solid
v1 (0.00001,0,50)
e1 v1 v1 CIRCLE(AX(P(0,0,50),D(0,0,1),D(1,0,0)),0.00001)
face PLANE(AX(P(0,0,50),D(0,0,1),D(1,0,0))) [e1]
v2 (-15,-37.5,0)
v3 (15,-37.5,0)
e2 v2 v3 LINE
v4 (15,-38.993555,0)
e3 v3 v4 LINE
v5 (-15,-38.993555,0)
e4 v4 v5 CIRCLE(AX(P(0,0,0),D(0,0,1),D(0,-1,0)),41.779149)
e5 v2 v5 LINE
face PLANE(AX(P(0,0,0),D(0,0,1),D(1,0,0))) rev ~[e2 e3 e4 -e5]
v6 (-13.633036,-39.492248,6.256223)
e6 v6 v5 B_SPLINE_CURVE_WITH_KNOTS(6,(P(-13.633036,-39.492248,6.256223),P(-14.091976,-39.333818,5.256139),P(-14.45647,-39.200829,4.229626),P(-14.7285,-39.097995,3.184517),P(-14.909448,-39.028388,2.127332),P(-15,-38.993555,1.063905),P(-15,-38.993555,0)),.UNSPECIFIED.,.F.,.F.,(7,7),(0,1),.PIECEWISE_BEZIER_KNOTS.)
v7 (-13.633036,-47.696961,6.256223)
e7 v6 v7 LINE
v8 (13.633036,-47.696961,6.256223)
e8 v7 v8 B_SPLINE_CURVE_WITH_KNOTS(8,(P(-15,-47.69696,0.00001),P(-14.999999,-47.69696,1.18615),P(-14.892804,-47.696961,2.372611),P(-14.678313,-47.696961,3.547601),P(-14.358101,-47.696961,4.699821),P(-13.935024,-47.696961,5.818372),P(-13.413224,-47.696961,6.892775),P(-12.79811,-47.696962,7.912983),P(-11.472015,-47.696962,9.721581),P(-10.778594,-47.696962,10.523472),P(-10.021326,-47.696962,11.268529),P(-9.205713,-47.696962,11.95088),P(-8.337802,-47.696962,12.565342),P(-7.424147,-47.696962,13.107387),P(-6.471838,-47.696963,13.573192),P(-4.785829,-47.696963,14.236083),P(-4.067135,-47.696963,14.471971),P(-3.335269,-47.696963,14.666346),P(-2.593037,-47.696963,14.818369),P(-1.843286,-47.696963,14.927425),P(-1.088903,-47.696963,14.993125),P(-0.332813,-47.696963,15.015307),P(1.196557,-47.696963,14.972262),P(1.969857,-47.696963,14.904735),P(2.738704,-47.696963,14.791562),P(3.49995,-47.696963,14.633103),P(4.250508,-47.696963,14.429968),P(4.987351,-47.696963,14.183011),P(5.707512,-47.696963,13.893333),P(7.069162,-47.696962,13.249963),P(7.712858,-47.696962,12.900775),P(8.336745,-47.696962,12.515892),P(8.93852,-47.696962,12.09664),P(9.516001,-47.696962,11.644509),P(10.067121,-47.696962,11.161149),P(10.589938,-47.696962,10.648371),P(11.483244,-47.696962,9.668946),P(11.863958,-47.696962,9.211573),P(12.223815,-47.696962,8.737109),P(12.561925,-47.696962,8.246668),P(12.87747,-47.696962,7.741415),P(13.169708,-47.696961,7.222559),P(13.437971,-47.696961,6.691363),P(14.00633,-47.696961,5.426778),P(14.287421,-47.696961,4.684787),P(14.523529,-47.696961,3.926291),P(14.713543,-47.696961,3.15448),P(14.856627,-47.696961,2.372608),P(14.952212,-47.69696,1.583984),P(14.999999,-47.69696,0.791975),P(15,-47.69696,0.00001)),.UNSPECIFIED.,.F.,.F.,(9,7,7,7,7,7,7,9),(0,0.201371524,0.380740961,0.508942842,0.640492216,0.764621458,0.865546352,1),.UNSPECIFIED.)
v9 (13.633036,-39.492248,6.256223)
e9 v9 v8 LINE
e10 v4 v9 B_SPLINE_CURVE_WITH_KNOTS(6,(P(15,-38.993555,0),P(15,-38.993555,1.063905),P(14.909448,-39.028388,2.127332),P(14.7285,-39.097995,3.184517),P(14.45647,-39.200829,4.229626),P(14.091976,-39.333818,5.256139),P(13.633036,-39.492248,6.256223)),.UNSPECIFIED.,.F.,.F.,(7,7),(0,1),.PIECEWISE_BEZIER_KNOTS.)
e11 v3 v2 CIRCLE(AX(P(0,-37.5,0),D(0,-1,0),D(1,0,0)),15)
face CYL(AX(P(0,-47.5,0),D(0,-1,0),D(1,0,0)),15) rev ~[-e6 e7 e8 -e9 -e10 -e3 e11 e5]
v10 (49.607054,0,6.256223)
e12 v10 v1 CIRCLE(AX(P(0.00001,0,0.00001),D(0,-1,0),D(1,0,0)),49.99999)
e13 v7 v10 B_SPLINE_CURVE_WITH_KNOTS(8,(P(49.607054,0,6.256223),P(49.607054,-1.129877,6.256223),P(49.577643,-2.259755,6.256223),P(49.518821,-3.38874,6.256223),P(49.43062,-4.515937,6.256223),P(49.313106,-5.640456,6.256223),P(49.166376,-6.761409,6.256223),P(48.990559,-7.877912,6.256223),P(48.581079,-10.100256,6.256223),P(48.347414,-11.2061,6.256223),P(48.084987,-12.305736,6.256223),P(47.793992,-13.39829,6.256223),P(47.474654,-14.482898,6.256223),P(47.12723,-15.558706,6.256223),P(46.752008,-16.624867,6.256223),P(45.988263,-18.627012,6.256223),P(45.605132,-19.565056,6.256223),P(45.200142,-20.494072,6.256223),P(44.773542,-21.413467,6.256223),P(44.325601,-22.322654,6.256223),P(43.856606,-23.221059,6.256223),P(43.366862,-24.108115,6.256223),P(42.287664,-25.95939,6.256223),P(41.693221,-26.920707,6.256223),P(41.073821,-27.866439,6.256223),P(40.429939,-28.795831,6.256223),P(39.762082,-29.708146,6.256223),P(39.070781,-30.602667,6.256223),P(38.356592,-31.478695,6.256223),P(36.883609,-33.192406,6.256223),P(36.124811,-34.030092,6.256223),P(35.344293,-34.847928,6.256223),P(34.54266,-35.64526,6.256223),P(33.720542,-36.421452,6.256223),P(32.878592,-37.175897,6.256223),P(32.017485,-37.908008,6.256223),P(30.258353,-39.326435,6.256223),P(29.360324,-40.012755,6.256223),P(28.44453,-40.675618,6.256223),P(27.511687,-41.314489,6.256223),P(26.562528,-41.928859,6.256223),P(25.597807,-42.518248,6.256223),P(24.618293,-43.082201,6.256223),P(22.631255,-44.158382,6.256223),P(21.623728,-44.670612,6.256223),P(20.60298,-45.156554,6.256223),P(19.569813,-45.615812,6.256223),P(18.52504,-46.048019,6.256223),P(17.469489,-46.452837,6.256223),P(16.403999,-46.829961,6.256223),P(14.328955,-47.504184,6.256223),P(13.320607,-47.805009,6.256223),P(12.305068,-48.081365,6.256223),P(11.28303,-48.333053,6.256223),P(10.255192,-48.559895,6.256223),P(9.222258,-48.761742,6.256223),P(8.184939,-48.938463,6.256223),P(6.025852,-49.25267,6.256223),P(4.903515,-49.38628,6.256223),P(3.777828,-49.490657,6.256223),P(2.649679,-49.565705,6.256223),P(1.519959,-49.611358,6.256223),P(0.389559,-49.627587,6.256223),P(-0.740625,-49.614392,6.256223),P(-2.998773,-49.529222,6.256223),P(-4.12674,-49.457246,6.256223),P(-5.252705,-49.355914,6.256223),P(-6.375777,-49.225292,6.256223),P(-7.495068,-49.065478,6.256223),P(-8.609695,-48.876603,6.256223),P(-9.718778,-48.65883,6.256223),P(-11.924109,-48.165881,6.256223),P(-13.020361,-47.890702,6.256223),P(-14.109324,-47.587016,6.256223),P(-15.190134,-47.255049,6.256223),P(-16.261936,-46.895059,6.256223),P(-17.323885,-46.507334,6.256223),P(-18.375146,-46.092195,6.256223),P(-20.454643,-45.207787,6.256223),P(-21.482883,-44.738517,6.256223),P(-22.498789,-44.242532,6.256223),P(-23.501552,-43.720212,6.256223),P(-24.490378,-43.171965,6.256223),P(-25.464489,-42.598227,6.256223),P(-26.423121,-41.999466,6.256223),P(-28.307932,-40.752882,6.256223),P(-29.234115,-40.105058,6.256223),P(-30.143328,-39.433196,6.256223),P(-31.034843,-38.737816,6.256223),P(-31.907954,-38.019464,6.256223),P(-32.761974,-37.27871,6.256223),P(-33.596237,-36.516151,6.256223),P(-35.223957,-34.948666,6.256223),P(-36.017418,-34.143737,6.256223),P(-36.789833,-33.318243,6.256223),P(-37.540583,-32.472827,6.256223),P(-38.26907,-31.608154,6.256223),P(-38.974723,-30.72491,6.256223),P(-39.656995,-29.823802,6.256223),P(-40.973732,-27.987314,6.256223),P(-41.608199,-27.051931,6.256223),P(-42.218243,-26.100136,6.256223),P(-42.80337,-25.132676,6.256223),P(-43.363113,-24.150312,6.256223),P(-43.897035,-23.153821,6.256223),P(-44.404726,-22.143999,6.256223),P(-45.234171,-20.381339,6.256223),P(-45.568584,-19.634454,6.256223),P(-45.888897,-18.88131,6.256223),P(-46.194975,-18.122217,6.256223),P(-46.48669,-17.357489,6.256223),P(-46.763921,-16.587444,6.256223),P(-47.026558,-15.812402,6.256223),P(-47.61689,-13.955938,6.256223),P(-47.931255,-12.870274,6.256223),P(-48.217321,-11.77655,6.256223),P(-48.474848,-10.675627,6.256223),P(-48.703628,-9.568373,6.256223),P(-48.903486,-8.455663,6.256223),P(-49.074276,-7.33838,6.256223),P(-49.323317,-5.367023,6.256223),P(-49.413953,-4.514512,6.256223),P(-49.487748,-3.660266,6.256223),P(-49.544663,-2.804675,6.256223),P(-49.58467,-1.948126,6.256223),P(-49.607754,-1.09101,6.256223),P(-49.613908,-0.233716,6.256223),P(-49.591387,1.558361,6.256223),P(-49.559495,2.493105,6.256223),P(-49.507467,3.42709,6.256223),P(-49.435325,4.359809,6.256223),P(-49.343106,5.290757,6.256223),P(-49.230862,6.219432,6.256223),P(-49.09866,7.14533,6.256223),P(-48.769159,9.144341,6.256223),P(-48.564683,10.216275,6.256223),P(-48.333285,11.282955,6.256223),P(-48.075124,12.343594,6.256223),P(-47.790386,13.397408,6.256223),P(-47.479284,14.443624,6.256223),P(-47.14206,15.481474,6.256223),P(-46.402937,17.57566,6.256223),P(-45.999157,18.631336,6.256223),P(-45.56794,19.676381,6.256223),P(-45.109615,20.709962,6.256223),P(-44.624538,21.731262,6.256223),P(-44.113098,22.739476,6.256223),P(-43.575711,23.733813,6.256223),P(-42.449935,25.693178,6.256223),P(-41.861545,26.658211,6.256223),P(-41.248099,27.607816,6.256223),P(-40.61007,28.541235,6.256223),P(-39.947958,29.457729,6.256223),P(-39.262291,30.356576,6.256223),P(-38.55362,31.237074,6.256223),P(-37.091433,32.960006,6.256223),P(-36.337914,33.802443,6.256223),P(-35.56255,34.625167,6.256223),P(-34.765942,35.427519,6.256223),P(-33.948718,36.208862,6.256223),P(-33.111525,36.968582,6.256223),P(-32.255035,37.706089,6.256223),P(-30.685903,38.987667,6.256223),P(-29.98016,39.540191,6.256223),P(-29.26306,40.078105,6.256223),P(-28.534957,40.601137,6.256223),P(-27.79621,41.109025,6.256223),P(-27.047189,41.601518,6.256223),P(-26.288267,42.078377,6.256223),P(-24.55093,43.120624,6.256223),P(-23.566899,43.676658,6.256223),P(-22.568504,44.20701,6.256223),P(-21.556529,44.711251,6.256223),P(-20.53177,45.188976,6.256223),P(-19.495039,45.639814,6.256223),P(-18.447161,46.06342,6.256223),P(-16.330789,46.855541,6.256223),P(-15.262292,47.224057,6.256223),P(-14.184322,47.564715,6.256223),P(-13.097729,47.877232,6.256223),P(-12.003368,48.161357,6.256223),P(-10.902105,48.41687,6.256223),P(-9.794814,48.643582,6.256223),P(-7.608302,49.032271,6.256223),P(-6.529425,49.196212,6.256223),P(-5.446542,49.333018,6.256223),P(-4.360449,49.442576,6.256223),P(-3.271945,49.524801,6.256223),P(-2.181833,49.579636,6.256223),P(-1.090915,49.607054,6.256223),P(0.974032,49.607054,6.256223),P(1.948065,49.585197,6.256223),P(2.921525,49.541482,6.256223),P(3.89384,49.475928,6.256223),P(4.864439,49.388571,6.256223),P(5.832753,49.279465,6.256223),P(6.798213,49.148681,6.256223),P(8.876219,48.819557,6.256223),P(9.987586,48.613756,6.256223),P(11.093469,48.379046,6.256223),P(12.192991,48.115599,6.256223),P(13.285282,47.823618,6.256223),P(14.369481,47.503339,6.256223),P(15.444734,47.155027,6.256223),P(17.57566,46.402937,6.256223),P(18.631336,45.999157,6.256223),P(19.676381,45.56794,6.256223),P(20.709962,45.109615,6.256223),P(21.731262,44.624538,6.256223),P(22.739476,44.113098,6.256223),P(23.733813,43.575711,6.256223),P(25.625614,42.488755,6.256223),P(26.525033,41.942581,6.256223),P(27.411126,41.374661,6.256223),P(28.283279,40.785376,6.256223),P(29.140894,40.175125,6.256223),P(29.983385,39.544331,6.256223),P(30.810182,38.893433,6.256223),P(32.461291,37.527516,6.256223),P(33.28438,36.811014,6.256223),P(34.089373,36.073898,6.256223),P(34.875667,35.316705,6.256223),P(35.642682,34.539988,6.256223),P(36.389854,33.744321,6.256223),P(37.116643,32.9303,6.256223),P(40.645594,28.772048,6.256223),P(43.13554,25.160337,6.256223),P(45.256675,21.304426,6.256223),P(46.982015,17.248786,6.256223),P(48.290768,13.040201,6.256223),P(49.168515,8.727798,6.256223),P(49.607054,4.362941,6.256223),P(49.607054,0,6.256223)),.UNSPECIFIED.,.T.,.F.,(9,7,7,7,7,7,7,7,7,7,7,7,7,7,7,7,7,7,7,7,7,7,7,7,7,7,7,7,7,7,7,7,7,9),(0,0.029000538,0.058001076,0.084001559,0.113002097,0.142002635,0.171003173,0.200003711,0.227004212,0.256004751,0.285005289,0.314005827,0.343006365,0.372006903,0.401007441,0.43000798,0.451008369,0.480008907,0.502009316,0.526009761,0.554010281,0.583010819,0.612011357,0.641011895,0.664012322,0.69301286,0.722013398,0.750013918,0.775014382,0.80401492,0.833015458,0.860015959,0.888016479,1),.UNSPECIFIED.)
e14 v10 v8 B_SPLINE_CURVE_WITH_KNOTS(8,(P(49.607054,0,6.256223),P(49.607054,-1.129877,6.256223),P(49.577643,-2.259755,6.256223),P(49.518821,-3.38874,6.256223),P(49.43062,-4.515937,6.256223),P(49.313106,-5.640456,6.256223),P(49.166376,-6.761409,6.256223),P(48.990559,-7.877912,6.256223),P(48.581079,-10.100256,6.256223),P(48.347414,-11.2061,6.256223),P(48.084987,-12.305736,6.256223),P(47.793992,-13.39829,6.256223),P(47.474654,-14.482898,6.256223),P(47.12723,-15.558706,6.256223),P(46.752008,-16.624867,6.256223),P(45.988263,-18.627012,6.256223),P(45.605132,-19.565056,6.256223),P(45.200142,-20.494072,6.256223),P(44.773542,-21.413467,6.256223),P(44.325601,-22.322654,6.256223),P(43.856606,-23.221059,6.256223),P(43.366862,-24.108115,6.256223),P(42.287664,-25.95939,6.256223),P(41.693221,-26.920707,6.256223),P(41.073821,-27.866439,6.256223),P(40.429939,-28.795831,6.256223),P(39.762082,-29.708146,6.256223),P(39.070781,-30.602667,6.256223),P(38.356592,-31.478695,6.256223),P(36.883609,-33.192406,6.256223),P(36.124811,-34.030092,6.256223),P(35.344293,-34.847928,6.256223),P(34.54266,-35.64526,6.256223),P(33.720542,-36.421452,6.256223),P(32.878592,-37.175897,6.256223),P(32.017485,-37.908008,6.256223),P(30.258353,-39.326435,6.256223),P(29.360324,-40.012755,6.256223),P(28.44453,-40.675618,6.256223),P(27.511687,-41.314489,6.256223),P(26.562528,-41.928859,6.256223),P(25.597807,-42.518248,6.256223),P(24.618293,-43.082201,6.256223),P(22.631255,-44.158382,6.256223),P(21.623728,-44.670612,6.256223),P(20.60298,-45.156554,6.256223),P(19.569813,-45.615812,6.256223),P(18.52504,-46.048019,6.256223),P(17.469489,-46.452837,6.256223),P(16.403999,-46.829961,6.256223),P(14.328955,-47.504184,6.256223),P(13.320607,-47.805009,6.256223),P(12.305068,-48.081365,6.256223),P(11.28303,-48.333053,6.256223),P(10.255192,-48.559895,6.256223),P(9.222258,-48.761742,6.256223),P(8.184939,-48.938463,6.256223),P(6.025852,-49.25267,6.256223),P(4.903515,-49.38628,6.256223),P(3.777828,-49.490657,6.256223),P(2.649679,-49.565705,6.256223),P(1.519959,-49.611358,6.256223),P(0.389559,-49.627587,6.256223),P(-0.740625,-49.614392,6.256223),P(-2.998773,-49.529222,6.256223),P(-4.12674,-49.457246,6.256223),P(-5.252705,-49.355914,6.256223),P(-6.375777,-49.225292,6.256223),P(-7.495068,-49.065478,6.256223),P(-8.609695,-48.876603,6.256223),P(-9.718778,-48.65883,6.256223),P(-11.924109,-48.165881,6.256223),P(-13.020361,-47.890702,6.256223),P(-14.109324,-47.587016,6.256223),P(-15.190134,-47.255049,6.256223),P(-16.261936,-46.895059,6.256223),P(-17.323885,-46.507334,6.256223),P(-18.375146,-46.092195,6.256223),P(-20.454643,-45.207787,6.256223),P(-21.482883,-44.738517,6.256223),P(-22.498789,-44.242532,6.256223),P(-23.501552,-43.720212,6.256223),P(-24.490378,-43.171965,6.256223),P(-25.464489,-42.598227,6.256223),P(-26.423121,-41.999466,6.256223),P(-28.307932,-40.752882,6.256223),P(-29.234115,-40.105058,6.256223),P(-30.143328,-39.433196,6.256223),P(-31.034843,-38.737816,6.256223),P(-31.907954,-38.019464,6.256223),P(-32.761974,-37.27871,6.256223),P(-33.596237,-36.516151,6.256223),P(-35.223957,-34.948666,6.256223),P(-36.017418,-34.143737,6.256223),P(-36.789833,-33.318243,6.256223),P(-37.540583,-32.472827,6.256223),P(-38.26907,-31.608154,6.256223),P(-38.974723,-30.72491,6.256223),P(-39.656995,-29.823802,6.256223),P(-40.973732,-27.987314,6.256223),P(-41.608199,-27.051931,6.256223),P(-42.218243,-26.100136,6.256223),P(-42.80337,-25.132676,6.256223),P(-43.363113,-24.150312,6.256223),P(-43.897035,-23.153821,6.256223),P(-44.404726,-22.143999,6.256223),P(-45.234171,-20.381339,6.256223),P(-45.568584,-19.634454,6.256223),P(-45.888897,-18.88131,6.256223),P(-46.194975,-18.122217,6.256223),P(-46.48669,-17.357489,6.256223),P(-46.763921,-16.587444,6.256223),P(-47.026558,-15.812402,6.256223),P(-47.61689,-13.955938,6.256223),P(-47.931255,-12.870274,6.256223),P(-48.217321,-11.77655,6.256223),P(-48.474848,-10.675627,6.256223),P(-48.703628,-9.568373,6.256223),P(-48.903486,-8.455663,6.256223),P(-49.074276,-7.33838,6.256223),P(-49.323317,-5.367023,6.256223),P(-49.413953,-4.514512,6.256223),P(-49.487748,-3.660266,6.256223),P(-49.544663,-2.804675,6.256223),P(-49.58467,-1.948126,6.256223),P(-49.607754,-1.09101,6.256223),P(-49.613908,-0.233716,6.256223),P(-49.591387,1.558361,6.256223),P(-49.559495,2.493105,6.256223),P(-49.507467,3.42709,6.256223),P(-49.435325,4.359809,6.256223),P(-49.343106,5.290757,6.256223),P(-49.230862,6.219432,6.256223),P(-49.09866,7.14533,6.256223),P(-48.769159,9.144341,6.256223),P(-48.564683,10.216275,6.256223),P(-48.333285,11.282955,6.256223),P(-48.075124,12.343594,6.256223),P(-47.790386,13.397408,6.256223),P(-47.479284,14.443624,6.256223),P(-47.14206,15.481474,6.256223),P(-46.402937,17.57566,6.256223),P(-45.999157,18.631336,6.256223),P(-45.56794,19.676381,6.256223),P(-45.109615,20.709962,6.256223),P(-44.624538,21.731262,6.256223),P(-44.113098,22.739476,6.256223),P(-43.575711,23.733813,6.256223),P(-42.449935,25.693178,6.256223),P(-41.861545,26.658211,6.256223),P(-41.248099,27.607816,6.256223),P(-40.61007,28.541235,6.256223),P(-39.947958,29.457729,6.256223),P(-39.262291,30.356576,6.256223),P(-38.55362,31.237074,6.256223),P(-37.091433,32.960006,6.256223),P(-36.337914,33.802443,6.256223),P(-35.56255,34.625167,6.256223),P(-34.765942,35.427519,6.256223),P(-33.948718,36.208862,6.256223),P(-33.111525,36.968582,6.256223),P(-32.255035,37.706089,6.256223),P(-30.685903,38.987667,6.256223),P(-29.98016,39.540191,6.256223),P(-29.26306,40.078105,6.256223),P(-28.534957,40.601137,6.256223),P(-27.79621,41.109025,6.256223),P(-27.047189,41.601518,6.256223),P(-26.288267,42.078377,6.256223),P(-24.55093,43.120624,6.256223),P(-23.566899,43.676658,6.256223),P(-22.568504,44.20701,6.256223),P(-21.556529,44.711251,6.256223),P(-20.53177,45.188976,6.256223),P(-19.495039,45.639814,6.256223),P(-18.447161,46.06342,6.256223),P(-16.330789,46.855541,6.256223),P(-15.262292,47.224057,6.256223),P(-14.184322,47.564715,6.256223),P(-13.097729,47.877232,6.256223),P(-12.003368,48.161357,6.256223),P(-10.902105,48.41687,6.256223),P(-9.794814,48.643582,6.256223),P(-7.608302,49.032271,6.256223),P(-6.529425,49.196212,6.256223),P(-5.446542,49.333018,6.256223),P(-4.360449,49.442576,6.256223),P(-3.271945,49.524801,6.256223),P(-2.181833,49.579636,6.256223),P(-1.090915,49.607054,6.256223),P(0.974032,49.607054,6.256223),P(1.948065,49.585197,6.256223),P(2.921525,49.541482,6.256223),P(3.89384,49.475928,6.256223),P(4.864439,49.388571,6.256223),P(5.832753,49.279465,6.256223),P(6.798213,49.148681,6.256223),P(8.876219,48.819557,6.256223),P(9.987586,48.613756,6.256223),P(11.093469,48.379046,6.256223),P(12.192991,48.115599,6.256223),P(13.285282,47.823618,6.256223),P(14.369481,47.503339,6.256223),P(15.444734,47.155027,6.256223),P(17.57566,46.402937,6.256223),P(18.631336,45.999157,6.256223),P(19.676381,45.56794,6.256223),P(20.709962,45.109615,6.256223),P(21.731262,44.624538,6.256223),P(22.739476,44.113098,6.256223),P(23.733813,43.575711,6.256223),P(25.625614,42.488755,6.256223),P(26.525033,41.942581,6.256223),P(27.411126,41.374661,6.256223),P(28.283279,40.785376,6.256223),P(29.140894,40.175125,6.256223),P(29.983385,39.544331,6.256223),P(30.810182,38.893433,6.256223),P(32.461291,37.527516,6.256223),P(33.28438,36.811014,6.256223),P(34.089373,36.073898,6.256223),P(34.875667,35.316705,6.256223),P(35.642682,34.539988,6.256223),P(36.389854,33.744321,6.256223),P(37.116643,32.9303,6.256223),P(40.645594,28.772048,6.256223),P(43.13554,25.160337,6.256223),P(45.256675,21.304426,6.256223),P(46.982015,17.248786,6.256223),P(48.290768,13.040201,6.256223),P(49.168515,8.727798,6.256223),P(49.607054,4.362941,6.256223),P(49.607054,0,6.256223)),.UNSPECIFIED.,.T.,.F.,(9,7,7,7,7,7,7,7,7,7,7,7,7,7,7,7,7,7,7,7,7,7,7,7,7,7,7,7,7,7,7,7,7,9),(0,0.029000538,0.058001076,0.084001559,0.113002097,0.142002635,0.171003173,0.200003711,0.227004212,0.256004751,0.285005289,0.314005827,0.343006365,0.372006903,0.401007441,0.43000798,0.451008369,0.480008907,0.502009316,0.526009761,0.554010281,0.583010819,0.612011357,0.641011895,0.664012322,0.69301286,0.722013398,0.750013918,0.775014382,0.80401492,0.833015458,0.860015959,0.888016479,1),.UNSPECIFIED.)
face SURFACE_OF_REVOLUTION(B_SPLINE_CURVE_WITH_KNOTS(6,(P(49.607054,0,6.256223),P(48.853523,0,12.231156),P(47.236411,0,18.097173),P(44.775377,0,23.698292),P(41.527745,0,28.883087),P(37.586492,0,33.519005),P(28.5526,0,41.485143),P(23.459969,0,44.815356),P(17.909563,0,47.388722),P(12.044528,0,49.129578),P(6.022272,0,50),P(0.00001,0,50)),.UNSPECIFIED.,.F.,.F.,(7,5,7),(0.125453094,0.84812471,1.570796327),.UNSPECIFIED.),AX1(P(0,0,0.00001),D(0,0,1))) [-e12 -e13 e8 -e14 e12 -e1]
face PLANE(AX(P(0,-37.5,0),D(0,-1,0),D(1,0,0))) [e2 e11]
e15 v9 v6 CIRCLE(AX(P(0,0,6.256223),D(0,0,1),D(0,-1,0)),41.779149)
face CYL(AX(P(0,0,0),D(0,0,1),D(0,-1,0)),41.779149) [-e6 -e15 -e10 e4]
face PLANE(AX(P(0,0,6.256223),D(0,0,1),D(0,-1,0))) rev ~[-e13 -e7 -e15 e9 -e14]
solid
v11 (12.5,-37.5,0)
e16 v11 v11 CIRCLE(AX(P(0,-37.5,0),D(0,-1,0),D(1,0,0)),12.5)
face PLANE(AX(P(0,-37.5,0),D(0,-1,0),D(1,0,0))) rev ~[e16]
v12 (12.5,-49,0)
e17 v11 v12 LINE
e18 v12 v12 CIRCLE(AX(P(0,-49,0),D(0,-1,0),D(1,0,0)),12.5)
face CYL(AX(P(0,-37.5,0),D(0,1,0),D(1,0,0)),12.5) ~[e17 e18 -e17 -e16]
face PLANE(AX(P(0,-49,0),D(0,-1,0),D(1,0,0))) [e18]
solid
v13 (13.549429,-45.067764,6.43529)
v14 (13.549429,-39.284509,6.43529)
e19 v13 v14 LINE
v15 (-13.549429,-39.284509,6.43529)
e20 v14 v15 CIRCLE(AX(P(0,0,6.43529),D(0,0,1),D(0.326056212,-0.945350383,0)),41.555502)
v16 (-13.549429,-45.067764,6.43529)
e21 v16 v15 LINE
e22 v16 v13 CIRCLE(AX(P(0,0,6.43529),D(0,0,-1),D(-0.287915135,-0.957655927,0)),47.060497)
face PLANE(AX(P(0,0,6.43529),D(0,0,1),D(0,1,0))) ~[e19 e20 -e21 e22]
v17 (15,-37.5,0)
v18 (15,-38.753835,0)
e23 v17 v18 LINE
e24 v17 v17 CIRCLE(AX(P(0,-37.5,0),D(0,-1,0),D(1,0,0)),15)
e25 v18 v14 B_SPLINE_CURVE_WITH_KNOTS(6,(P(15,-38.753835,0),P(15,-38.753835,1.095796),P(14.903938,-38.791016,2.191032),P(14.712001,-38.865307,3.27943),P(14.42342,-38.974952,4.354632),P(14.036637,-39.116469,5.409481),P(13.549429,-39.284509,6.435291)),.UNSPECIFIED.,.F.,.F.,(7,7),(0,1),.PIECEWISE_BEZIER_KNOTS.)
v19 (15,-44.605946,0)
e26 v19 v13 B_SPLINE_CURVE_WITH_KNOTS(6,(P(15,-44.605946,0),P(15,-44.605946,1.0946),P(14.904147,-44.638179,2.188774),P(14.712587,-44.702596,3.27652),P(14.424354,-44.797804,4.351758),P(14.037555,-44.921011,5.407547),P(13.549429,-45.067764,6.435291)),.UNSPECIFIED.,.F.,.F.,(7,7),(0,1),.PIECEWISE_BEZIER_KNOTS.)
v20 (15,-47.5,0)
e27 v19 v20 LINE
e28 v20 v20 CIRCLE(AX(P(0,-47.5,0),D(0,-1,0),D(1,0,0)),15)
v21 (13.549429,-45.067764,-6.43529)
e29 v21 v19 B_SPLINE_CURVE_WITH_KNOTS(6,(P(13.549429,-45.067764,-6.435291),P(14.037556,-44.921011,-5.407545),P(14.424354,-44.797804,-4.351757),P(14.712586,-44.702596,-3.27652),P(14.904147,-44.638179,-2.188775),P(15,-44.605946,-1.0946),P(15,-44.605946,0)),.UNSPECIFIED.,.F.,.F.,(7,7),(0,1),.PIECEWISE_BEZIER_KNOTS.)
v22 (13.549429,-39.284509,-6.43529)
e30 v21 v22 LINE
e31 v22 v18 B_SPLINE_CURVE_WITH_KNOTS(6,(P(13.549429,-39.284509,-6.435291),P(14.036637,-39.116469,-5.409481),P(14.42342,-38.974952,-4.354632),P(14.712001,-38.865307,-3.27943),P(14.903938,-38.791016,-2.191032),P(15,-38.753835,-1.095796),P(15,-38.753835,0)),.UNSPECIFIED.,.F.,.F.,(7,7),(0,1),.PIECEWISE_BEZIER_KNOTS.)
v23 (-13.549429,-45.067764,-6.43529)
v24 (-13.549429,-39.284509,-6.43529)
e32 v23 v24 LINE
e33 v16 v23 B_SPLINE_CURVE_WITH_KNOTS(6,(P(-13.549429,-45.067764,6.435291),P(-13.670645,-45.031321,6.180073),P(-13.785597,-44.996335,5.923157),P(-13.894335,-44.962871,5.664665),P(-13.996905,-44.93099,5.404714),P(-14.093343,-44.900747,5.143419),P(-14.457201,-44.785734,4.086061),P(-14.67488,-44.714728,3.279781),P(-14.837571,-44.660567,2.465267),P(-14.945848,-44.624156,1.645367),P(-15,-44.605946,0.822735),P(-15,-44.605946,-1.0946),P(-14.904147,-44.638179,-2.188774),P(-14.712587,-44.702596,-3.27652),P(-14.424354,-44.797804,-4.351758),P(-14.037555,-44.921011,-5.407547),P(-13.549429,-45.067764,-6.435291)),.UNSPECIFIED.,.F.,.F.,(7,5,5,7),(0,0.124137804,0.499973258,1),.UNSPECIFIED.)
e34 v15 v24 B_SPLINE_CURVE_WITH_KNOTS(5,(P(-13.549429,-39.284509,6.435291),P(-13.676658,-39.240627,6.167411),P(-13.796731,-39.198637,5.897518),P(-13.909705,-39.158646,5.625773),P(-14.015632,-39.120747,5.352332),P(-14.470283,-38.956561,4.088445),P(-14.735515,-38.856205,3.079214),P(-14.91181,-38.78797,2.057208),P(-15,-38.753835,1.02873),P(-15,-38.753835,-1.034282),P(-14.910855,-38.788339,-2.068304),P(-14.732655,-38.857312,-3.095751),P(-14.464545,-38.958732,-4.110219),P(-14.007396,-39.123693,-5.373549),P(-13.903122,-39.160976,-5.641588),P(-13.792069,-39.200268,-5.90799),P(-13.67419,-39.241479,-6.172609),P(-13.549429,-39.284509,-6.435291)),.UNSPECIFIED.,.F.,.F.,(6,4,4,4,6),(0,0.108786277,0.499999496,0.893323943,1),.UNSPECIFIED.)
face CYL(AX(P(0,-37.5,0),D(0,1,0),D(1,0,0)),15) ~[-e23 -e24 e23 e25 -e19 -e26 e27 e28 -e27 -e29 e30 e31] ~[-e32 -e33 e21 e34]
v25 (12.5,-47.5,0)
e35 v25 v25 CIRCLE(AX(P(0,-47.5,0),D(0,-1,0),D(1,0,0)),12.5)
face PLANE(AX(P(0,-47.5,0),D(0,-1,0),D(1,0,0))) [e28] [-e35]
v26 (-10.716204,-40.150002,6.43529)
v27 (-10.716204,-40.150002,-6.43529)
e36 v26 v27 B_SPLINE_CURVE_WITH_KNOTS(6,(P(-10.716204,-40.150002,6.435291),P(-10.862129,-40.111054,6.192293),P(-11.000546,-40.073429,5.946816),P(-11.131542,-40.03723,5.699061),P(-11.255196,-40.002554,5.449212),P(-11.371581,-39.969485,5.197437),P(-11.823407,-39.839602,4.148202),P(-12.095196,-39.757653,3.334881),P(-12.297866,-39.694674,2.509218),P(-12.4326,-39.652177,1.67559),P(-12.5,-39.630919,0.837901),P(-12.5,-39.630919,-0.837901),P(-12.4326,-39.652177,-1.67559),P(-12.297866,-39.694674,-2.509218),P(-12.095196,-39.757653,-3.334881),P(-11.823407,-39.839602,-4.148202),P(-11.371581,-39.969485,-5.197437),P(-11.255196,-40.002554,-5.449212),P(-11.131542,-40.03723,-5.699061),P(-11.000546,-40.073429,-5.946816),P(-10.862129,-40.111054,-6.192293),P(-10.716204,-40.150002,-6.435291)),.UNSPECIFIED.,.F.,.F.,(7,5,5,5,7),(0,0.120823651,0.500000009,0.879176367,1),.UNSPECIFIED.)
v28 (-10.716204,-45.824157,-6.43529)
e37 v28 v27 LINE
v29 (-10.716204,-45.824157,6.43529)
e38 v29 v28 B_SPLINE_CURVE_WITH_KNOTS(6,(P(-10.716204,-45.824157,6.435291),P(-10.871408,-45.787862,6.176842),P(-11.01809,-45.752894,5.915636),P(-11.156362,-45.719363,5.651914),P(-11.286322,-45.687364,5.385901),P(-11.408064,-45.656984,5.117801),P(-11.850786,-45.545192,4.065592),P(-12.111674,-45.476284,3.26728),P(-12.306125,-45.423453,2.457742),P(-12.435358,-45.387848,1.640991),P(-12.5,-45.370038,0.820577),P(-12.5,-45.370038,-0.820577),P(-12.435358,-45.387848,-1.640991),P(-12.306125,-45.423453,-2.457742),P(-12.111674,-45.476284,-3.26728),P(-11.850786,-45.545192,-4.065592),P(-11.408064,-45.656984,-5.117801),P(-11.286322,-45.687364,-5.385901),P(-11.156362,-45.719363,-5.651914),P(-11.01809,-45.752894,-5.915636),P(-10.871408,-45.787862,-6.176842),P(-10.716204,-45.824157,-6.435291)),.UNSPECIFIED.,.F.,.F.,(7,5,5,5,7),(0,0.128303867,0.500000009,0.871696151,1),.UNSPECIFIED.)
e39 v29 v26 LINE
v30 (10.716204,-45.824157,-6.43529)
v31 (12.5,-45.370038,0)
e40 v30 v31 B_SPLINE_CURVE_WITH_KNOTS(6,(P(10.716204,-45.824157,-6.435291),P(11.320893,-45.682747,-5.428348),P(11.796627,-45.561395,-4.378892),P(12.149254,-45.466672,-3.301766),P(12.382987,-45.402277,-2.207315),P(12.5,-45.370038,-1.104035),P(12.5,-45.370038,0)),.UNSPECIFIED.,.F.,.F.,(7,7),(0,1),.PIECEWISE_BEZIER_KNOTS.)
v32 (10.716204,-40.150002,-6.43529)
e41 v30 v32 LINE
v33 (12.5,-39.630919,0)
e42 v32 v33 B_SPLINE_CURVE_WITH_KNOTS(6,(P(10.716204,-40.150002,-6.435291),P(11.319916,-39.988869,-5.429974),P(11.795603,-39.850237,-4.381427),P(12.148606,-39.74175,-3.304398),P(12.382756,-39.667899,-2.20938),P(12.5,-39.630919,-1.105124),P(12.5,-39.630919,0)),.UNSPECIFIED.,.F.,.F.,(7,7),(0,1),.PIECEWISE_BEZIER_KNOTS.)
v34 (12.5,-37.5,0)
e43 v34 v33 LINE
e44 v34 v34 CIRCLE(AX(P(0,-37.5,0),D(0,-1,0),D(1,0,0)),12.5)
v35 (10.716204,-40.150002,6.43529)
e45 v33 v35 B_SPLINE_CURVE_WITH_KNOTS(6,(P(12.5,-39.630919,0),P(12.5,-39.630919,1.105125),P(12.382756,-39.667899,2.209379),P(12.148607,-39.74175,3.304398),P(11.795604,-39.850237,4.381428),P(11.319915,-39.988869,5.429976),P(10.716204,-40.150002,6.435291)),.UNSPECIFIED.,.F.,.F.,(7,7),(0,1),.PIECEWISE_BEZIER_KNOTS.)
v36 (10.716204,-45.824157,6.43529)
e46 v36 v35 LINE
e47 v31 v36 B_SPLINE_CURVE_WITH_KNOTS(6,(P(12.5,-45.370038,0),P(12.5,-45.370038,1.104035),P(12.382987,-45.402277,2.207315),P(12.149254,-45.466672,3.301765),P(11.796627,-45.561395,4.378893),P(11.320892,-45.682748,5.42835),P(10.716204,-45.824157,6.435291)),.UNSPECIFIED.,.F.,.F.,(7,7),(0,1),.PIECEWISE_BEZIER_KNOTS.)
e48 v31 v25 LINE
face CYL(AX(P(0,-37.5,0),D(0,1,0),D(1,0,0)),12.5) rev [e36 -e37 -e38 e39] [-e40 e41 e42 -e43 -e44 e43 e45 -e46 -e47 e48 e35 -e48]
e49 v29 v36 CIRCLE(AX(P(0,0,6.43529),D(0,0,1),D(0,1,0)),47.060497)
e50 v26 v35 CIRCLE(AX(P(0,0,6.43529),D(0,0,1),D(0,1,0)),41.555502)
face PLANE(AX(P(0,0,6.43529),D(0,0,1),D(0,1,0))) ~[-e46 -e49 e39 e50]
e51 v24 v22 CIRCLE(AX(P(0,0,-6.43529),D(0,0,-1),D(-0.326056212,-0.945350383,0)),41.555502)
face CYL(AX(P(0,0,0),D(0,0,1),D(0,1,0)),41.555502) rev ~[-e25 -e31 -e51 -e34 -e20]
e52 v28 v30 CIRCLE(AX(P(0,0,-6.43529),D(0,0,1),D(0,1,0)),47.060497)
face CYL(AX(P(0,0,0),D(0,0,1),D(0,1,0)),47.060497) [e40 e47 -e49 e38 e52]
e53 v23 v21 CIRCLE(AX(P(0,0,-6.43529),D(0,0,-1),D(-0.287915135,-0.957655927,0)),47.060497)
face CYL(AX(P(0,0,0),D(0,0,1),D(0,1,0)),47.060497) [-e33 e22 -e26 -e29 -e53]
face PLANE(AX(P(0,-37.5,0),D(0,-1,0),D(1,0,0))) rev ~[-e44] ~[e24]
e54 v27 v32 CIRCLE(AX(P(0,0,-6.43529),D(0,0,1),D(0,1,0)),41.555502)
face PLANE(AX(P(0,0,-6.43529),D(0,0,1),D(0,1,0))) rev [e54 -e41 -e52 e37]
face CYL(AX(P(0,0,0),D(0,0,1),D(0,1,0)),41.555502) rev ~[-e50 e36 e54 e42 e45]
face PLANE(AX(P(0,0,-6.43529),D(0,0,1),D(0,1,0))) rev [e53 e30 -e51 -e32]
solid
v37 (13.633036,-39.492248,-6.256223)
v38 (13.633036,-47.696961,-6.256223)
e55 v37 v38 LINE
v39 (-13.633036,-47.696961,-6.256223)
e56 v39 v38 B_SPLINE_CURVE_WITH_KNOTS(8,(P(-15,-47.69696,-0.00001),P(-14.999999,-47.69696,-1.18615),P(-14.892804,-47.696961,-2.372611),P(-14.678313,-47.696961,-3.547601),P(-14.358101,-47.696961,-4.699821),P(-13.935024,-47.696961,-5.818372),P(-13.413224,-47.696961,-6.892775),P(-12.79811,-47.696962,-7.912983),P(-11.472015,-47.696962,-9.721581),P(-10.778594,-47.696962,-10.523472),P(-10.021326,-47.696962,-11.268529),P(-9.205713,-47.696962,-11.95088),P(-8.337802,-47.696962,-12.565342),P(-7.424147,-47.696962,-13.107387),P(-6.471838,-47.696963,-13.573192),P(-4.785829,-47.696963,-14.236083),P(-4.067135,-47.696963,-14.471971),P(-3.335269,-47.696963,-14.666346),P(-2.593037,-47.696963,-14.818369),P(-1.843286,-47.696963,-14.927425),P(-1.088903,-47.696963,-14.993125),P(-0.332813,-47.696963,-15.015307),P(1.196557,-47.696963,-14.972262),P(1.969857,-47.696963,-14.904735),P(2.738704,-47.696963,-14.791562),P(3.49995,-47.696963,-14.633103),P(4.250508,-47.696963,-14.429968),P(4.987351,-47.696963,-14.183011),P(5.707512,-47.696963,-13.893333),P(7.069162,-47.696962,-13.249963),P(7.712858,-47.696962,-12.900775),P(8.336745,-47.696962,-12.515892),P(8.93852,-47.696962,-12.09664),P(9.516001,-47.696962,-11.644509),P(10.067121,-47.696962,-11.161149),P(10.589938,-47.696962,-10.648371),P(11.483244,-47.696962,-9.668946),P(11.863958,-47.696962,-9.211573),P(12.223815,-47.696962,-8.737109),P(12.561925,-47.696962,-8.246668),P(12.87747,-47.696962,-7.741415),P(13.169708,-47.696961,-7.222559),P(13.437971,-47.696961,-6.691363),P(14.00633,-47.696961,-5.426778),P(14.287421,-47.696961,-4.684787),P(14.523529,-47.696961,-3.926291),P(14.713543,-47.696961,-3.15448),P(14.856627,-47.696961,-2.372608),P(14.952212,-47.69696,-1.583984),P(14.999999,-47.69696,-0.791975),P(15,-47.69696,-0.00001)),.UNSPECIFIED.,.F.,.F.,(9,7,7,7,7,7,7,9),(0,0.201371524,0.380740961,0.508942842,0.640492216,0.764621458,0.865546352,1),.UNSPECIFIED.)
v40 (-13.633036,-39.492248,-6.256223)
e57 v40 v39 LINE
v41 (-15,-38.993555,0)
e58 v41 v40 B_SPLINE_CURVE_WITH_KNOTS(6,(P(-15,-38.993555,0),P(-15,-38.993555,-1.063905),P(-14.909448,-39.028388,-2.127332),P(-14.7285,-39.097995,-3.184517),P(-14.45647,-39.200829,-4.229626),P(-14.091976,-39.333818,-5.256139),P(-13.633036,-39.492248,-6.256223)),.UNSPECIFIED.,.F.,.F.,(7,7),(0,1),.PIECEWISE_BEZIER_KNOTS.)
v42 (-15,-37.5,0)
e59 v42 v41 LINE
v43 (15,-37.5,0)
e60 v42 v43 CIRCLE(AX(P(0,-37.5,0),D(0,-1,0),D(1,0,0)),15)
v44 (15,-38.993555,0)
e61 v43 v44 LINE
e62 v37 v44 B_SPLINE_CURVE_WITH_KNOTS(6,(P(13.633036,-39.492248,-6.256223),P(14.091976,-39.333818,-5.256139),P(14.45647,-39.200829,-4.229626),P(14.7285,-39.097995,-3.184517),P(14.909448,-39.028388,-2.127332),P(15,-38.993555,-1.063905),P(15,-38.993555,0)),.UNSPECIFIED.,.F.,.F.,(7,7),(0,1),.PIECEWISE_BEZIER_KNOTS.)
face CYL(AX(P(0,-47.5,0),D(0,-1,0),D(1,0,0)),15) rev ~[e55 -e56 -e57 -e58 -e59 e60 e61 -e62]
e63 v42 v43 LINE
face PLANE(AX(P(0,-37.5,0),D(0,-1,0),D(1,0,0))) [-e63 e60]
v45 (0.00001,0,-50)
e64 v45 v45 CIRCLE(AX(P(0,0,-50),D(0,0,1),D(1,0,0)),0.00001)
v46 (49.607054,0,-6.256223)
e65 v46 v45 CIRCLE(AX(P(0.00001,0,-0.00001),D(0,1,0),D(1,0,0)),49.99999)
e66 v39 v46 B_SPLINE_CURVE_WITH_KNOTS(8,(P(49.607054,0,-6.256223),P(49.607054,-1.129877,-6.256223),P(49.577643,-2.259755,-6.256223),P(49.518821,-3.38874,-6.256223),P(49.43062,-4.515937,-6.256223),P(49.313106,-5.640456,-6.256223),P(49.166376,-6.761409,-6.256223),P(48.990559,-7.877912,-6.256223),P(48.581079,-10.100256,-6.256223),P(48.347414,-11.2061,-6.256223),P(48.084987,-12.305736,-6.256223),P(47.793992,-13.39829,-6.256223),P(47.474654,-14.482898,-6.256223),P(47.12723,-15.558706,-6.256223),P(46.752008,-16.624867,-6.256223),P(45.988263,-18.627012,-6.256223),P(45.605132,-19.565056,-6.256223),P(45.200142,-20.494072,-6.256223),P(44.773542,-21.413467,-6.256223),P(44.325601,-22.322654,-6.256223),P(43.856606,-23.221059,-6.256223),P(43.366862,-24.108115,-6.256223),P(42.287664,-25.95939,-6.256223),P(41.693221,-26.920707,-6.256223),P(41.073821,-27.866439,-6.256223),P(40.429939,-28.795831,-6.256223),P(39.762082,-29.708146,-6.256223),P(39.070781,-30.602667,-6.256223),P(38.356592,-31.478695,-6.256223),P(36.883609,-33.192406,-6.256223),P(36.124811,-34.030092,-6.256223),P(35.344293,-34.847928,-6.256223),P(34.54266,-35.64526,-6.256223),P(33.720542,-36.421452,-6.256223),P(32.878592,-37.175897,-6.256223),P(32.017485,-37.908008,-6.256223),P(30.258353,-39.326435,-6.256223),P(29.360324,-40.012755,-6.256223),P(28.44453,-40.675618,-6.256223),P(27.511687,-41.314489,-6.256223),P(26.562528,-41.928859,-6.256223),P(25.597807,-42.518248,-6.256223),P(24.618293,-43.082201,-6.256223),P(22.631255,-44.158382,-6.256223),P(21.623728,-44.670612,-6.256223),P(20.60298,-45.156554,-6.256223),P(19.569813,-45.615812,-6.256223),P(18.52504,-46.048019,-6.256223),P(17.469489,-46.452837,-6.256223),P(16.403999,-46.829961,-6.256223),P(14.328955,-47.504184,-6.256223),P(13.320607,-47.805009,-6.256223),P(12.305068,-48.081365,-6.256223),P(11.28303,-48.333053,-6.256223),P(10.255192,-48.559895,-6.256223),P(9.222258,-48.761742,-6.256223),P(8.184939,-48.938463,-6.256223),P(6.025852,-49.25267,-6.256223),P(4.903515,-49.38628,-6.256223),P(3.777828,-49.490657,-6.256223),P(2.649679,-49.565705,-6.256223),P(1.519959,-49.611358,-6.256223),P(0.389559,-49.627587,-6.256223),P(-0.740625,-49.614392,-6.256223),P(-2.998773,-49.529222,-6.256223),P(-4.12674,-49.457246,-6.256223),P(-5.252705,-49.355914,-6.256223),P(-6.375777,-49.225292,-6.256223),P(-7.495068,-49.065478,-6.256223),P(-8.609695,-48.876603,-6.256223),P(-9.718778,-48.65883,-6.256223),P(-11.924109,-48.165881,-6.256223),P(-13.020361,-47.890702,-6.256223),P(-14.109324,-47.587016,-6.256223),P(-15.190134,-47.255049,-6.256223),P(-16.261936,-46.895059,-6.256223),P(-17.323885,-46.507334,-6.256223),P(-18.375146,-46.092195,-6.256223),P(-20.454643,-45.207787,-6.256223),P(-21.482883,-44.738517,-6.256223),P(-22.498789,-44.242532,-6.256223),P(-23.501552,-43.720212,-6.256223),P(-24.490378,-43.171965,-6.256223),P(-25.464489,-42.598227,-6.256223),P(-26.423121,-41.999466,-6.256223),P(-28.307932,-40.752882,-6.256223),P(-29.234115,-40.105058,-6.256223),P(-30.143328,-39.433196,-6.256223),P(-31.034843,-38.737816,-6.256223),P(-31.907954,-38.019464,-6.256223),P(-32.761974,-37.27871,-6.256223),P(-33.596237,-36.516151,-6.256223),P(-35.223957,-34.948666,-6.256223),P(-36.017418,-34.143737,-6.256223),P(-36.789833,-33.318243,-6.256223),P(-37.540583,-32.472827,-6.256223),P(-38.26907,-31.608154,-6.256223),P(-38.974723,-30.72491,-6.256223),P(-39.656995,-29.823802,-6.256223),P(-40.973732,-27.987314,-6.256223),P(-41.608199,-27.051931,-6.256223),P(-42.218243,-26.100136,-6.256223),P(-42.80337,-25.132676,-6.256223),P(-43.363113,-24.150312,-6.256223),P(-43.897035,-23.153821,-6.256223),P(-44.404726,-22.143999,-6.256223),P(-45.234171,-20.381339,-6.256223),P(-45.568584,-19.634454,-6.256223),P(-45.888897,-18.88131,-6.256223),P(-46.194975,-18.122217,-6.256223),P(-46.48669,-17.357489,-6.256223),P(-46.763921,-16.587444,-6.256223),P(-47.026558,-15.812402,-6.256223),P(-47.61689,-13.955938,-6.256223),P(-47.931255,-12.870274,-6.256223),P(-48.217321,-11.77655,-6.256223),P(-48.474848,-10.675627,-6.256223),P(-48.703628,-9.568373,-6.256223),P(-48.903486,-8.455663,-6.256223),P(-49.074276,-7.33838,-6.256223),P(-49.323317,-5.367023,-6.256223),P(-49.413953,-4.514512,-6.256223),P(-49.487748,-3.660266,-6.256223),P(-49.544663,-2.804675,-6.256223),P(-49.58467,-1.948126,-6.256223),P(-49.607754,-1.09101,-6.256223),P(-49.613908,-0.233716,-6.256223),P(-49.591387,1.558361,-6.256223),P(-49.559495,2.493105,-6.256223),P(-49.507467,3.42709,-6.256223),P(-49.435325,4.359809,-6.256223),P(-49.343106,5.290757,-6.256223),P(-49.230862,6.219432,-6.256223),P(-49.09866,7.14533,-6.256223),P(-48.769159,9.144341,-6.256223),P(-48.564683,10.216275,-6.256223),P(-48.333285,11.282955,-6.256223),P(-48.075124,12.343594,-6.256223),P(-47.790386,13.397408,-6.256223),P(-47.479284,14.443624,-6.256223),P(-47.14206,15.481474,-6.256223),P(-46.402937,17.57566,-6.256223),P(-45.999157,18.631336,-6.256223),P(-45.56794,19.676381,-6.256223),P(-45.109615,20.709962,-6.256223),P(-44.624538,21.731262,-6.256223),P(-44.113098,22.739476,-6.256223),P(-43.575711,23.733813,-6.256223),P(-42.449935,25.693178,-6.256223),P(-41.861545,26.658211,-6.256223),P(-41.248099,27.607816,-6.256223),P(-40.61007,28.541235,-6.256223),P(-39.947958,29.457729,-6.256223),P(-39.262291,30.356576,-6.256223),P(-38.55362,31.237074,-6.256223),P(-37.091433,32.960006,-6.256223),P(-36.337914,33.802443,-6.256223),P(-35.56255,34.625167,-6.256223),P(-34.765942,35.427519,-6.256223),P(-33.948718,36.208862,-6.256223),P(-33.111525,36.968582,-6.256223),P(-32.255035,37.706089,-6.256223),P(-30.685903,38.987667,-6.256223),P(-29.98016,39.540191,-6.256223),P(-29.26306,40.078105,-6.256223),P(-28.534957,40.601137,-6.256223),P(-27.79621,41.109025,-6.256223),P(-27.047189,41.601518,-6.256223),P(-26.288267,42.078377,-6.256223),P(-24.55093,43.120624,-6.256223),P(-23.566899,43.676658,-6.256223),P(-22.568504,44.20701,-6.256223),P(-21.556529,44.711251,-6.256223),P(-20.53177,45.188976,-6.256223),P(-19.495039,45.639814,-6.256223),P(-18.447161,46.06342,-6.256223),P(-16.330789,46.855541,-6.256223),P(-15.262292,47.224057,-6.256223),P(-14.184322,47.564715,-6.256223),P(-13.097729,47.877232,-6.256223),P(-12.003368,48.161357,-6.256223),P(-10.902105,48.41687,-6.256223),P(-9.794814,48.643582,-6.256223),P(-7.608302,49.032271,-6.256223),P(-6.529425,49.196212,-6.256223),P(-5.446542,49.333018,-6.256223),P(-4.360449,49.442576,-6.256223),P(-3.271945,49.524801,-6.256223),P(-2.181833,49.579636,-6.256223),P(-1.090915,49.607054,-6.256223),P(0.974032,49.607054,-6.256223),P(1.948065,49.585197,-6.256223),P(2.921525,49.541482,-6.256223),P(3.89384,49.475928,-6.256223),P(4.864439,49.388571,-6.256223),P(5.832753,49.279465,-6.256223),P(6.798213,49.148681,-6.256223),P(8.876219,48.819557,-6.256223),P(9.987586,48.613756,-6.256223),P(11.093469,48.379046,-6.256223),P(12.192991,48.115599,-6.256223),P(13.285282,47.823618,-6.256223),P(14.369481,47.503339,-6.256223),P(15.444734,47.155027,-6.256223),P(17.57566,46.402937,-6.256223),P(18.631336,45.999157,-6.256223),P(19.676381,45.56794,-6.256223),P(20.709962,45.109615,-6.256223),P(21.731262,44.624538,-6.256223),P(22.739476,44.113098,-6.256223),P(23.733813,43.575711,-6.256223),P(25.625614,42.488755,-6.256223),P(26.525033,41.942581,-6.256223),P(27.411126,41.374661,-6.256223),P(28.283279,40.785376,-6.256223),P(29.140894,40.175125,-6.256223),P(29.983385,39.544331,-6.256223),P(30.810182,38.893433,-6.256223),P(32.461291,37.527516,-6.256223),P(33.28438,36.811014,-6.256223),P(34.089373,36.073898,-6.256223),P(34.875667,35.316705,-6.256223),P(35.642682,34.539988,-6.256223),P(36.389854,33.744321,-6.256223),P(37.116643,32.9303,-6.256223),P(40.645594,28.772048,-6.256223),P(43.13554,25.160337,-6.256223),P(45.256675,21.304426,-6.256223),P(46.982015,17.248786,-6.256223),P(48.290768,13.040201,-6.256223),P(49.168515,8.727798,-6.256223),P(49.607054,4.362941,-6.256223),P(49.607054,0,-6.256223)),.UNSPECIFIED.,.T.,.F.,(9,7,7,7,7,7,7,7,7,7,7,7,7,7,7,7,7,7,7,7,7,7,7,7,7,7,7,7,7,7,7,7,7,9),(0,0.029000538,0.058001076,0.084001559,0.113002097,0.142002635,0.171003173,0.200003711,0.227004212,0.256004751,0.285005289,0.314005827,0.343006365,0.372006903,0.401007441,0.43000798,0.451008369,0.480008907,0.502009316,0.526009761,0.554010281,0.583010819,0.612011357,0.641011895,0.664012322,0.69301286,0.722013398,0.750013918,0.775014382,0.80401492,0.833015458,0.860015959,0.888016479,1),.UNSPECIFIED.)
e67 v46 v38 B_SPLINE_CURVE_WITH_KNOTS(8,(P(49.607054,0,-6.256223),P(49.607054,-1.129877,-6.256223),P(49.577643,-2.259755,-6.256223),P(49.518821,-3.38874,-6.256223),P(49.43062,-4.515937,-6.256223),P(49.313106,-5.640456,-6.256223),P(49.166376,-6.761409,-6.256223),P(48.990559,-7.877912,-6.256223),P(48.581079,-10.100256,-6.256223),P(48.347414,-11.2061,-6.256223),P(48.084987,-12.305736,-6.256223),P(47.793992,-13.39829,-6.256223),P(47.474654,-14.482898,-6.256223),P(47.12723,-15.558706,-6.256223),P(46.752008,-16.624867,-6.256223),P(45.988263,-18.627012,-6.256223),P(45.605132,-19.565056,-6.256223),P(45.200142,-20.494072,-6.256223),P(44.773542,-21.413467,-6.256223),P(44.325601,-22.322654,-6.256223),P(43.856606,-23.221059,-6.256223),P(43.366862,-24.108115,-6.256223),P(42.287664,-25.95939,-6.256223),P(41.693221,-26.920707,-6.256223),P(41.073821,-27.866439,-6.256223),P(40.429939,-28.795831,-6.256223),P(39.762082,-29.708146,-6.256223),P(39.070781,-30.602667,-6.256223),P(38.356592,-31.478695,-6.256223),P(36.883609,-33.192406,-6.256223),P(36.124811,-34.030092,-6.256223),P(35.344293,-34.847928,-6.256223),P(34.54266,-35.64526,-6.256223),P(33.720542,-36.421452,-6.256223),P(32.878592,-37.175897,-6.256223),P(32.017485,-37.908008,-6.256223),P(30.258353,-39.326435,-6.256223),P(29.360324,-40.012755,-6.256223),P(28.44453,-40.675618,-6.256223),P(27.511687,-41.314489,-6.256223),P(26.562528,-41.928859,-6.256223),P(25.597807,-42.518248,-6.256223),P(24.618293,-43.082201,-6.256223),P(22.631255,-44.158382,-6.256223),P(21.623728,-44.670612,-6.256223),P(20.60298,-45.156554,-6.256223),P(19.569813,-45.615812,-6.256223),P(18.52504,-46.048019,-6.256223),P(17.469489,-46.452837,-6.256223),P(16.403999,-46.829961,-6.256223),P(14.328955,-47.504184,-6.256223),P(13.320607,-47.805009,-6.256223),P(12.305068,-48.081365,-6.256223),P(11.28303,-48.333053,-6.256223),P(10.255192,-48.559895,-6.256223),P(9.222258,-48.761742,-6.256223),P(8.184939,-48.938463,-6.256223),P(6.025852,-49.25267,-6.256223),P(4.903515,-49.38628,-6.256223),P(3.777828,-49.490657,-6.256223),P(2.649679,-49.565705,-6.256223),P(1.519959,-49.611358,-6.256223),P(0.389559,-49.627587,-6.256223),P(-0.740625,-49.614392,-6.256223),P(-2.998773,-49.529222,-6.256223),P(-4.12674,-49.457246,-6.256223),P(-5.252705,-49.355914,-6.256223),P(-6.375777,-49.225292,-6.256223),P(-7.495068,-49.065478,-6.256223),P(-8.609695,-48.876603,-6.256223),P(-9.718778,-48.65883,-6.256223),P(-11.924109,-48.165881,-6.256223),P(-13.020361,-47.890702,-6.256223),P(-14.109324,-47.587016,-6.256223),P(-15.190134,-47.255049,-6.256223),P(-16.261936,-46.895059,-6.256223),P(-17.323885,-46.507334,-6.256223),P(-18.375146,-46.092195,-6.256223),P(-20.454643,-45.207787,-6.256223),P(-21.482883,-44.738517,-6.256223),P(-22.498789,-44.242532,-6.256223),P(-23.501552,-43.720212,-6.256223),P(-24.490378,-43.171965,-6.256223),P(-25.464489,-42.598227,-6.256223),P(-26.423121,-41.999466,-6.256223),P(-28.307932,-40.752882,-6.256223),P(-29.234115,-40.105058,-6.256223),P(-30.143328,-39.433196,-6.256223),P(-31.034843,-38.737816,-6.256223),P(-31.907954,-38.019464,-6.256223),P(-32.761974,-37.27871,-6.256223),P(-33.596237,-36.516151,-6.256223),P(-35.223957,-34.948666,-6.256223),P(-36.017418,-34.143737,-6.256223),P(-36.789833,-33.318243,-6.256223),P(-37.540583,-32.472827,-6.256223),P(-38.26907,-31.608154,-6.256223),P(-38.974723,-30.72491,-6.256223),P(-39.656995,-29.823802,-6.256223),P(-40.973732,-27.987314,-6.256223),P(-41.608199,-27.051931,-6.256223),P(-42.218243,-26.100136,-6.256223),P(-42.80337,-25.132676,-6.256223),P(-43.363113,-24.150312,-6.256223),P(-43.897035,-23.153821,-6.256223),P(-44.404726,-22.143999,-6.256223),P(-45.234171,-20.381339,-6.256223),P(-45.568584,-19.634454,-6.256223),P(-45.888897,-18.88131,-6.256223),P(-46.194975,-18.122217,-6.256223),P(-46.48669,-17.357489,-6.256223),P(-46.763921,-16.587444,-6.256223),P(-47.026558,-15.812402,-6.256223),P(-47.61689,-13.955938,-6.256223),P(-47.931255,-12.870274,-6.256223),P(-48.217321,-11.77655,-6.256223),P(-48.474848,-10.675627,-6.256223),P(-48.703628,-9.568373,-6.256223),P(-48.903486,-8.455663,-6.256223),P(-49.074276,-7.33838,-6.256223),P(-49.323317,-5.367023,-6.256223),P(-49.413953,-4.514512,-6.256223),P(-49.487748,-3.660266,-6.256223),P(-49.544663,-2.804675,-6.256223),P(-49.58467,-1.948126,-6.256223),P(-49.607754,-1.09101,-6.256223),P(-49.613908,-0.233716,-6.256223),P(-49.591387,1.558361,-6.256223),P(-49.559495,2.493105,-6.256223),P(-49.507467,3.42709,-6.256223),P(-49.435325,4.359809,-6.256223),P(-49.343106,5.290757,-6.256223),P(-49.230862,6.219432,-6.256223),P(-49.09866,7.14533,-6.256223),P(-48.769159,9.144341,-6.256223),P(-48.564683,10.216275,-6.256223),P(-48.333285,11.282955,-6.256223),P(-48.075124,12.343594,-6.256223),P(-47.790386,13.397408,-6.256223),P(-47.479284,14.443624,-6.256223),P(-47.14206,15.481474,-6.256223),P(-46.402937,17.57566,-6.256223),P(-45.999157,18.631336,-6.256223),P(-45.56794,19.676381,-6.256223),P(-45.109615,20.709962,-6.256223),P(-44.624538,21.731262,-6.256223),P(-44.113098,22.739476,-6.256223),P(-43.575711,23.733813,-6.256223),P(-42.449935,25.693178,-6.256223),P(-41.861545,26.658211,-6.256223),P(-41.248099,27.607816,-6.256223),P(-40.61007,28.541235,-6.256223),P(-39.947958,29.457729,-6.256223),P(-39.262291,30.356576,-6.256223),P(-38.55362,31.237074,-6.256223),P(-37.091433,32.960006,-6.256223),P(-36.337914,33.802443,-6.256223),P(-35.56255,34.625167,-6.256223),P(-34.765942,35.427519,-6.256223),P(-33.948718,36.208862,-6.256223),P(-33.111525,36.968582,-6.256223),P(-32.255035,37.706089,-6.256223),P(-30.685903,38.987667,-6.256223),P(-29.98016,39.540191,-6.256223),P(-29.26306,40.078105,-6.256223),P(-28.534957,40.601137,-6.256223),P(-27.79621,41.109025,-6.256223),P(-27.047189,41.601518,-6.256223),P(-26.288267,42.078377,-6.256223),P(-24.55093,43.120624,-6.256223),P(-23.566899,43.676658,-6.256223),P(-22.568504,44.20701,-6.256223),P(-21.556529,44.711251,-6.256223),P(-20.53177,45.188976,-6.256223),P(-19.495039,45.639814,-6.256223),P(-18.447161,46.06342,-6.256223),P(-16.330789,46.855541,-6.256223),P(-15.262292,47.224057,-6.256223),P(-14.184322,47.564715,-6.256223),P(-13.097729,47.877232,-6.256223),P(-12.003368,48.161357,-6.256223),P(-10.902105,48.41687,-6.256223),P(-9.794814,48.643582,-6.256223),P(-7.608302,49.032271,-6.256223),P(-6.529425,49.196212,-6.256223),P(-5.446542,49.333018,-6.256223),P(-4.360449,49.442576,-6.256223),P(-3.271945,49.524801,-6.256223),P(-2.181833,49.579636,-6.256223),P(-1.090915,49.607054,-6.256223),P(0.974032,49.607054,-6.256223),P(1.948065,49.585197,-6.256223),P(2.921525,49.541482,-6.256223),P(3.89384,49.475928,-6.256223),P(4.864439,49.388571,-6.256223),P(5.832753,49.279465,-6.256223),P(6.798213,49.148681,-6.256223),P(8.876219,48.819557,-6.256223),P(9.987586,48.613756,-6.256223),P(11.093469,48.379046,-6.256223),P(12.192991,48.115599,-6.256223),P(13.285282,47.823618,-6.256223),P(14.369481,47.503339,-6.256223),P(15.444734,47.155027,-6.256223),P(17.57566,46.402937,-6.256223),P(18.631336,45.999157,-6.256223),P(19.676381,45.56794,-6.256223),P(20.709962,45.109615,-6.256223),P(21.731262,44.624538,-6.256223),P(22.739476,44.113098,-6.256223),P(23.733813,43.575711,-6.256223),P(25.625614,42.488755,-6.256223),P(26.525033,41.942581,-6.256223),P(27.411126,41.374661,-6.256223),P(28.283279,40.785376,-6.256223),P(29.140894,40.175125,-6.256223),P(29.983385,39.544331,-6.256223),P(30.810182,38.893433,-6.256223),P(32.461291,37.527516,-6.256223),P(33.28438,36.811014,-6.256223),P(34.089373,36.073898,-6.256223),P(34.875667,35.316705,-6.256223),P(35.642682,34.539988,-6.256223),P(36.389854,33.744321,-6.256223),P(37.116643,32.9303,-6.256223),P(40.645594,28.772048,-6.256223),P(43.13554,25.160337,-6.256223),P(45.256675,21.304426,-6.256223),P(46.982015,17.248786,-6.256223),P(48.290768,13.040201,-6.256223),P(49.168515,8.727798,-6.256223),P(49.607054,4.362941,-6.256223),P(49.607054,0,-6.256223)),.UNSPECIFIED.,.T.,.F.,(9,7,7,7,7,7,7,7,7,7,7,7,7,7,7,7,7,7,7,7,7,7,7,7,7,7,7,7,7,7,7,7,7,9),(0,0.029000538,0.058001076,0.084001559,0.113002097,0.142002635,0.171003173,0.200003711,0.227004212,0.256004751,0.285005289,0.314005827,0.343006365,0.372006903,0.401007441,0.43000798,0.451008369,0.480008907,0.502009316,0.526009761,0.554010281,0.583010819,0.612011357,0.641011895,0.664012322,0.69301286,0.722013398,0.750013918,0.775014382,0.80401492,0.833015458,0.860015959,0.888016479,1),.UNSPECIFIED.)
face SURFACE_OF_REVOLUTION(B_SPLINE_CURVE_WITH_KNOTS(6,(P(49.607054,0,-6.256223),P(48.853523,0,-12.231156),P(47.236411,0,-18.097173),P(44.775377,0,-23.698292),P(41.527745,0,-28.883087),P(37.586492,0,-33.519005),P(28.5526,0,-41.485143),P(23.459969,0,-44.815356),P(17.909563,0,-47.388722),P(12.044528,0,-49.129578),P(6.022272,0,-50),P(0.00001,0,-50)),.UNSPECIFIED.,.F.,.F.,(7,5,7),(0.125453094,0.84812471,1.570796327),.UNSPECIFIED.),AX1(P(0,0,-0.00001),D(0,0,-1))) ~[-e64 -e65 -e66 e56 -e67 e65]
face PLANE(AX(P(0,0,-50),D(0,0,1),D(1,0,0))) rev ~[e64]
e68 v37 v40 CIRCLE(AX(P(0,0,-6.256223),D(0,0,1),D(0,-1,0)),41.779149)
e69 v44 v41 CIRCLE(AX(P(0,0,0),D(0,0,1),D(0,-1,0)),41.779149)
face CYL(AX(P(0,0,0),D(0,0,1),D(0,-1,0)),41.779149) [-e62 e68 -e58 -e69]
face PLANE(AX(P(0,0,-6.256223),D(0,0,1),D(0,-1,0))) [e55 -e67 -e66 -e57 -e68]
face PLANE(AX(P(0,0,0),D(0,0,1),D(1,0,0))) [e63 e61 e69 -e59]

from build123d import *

# Parameters (mm, degrees)
F0_R          = 50
F1_DEPTH      = 50
F2_R          = 49.99999
F3_DEPTH      = 50
F4_R          = 49.99999
F6_R          = 15
F7_DEPTH      = 2.5
F7_DEPTH_BACK = 10
F8_W          = 11.879876256
F8_H          = 12.5124454498
F10_W         = 5.5049955845
F10_H         = 12.8705808893
F13_R         = 15
F13_R_2       = 12.5
F14_DEPTH     = 10
F15_R         = 12.5
F16_DEPTH     = 11.5


# Not quite as in the source:
# - a fillet or chamfer is up to 0.001 mm smaller than in the source, because OpenCascade refuses the exact size


with BuildPart() as f1:
    # F0 (on Top) → F1 (new body)
    with BuildSketch(Plane.XY):
        Circle(F0_R)
    extrude(amount=F1_DEPTH)

    # F2 (radius 50 in the source; OpenCascade refuses exactly that, so slightly less here)
    f2_edges = [f1.edges().sort_by_distance(p)[0] for p in [
        (-50, 0, 50),
    ]]
    fillet(f2_edges, radius=F2_R)


with BuildPart() as f3:
    # F3 (new): a face of the model
    f3_faces = [f1.part.faces().sort_by_distance(p)[0] for p in [
        (0, 0, 0),
    ]]
    extrude(f3_faces, amount=F3_DEPTH)

    # F4 (radius 50 in the source; OpenCascade refuses exactly that, so slightly less here)
    f4_edges = [f3.edges().sort_by_distance(p)[0] for p in [
        (-50, 0, -50),
    ]]
    fillet(f4_edges, radius=F4_R)


with BuildPart() as f7_tool:
    # F6 (on offset) → F7 (new body, two sides)
    with BuildSketch(Plane.XZ.offset(47.5)) as f7_sk:
        Circle(F6_R)
    extrude(amount=F7_DEPTH)
    extrude(f7_sk.sketch, amount=-F7_DEPTH_BACK)


with BuildPart() as f1_1:
    add(f1.part)

    # F7: cut by f7_tool
    add(f7_tool.part, mode=Mode.SUBTRACT)


with BuildPart() as f3_1:
    add(f3.part)

    # F7: cut by f7_tool
    add(f7_tool.part, mode=Mode.SUBTRACT)


with BuildPart() as f9_tool:
    # F8 (on Right) → F9 (revolve)
    with BuildSketch(Plane.YZ):
        with Locations((-47.7190874517, 0)):
            Rectangle(F8_W, F8_H)
    revolve(axis=Axis((0, 0, 30.5323097855), (0, 0, 1)))


with BuildPart() as f1_2:
    add(f1_1.part)

    # F9: cut by f9_tool
    add(f9_tool.part, mode=Mode.SUBTRACT)


with BuildPart() as f3_2:
    add(f3_1.part)

    # F9: cut by f9_tool
    add(f9_tool.part, mode=Mode.SUBTRACT)


with BuildPart() as f11:
    # F10 (on Right) → F11 (revolve)
    with BuildSketch(Plane.YZ):
        with Locations((44.3079993129, 0)):
            Rectangle(F10_W, F10_H)
    revolve(axis=Axis((0, 0, 32.3998779058), (0, 0, 1)))

    # F13 (on face) → F14 (join)
    with BuildSketch(Plane.XZ.offset(37.5)):
        Circle(F13_R)
        Circle(F13_R_2, mode=Mode.SUBTRACT)
    extrude(amount=F14_DEPTH)


with BuildPart() as f16:
    # F15 (on face) → F16 (new body)
    with BuildSketch(Plane.XZ.offset(37.5)):
        Circle(F15_R)
    extrude(amount=F16_DEPTH)


solid = Compound([f1_2.part, f3_2.part, f11.part, f16.part])
